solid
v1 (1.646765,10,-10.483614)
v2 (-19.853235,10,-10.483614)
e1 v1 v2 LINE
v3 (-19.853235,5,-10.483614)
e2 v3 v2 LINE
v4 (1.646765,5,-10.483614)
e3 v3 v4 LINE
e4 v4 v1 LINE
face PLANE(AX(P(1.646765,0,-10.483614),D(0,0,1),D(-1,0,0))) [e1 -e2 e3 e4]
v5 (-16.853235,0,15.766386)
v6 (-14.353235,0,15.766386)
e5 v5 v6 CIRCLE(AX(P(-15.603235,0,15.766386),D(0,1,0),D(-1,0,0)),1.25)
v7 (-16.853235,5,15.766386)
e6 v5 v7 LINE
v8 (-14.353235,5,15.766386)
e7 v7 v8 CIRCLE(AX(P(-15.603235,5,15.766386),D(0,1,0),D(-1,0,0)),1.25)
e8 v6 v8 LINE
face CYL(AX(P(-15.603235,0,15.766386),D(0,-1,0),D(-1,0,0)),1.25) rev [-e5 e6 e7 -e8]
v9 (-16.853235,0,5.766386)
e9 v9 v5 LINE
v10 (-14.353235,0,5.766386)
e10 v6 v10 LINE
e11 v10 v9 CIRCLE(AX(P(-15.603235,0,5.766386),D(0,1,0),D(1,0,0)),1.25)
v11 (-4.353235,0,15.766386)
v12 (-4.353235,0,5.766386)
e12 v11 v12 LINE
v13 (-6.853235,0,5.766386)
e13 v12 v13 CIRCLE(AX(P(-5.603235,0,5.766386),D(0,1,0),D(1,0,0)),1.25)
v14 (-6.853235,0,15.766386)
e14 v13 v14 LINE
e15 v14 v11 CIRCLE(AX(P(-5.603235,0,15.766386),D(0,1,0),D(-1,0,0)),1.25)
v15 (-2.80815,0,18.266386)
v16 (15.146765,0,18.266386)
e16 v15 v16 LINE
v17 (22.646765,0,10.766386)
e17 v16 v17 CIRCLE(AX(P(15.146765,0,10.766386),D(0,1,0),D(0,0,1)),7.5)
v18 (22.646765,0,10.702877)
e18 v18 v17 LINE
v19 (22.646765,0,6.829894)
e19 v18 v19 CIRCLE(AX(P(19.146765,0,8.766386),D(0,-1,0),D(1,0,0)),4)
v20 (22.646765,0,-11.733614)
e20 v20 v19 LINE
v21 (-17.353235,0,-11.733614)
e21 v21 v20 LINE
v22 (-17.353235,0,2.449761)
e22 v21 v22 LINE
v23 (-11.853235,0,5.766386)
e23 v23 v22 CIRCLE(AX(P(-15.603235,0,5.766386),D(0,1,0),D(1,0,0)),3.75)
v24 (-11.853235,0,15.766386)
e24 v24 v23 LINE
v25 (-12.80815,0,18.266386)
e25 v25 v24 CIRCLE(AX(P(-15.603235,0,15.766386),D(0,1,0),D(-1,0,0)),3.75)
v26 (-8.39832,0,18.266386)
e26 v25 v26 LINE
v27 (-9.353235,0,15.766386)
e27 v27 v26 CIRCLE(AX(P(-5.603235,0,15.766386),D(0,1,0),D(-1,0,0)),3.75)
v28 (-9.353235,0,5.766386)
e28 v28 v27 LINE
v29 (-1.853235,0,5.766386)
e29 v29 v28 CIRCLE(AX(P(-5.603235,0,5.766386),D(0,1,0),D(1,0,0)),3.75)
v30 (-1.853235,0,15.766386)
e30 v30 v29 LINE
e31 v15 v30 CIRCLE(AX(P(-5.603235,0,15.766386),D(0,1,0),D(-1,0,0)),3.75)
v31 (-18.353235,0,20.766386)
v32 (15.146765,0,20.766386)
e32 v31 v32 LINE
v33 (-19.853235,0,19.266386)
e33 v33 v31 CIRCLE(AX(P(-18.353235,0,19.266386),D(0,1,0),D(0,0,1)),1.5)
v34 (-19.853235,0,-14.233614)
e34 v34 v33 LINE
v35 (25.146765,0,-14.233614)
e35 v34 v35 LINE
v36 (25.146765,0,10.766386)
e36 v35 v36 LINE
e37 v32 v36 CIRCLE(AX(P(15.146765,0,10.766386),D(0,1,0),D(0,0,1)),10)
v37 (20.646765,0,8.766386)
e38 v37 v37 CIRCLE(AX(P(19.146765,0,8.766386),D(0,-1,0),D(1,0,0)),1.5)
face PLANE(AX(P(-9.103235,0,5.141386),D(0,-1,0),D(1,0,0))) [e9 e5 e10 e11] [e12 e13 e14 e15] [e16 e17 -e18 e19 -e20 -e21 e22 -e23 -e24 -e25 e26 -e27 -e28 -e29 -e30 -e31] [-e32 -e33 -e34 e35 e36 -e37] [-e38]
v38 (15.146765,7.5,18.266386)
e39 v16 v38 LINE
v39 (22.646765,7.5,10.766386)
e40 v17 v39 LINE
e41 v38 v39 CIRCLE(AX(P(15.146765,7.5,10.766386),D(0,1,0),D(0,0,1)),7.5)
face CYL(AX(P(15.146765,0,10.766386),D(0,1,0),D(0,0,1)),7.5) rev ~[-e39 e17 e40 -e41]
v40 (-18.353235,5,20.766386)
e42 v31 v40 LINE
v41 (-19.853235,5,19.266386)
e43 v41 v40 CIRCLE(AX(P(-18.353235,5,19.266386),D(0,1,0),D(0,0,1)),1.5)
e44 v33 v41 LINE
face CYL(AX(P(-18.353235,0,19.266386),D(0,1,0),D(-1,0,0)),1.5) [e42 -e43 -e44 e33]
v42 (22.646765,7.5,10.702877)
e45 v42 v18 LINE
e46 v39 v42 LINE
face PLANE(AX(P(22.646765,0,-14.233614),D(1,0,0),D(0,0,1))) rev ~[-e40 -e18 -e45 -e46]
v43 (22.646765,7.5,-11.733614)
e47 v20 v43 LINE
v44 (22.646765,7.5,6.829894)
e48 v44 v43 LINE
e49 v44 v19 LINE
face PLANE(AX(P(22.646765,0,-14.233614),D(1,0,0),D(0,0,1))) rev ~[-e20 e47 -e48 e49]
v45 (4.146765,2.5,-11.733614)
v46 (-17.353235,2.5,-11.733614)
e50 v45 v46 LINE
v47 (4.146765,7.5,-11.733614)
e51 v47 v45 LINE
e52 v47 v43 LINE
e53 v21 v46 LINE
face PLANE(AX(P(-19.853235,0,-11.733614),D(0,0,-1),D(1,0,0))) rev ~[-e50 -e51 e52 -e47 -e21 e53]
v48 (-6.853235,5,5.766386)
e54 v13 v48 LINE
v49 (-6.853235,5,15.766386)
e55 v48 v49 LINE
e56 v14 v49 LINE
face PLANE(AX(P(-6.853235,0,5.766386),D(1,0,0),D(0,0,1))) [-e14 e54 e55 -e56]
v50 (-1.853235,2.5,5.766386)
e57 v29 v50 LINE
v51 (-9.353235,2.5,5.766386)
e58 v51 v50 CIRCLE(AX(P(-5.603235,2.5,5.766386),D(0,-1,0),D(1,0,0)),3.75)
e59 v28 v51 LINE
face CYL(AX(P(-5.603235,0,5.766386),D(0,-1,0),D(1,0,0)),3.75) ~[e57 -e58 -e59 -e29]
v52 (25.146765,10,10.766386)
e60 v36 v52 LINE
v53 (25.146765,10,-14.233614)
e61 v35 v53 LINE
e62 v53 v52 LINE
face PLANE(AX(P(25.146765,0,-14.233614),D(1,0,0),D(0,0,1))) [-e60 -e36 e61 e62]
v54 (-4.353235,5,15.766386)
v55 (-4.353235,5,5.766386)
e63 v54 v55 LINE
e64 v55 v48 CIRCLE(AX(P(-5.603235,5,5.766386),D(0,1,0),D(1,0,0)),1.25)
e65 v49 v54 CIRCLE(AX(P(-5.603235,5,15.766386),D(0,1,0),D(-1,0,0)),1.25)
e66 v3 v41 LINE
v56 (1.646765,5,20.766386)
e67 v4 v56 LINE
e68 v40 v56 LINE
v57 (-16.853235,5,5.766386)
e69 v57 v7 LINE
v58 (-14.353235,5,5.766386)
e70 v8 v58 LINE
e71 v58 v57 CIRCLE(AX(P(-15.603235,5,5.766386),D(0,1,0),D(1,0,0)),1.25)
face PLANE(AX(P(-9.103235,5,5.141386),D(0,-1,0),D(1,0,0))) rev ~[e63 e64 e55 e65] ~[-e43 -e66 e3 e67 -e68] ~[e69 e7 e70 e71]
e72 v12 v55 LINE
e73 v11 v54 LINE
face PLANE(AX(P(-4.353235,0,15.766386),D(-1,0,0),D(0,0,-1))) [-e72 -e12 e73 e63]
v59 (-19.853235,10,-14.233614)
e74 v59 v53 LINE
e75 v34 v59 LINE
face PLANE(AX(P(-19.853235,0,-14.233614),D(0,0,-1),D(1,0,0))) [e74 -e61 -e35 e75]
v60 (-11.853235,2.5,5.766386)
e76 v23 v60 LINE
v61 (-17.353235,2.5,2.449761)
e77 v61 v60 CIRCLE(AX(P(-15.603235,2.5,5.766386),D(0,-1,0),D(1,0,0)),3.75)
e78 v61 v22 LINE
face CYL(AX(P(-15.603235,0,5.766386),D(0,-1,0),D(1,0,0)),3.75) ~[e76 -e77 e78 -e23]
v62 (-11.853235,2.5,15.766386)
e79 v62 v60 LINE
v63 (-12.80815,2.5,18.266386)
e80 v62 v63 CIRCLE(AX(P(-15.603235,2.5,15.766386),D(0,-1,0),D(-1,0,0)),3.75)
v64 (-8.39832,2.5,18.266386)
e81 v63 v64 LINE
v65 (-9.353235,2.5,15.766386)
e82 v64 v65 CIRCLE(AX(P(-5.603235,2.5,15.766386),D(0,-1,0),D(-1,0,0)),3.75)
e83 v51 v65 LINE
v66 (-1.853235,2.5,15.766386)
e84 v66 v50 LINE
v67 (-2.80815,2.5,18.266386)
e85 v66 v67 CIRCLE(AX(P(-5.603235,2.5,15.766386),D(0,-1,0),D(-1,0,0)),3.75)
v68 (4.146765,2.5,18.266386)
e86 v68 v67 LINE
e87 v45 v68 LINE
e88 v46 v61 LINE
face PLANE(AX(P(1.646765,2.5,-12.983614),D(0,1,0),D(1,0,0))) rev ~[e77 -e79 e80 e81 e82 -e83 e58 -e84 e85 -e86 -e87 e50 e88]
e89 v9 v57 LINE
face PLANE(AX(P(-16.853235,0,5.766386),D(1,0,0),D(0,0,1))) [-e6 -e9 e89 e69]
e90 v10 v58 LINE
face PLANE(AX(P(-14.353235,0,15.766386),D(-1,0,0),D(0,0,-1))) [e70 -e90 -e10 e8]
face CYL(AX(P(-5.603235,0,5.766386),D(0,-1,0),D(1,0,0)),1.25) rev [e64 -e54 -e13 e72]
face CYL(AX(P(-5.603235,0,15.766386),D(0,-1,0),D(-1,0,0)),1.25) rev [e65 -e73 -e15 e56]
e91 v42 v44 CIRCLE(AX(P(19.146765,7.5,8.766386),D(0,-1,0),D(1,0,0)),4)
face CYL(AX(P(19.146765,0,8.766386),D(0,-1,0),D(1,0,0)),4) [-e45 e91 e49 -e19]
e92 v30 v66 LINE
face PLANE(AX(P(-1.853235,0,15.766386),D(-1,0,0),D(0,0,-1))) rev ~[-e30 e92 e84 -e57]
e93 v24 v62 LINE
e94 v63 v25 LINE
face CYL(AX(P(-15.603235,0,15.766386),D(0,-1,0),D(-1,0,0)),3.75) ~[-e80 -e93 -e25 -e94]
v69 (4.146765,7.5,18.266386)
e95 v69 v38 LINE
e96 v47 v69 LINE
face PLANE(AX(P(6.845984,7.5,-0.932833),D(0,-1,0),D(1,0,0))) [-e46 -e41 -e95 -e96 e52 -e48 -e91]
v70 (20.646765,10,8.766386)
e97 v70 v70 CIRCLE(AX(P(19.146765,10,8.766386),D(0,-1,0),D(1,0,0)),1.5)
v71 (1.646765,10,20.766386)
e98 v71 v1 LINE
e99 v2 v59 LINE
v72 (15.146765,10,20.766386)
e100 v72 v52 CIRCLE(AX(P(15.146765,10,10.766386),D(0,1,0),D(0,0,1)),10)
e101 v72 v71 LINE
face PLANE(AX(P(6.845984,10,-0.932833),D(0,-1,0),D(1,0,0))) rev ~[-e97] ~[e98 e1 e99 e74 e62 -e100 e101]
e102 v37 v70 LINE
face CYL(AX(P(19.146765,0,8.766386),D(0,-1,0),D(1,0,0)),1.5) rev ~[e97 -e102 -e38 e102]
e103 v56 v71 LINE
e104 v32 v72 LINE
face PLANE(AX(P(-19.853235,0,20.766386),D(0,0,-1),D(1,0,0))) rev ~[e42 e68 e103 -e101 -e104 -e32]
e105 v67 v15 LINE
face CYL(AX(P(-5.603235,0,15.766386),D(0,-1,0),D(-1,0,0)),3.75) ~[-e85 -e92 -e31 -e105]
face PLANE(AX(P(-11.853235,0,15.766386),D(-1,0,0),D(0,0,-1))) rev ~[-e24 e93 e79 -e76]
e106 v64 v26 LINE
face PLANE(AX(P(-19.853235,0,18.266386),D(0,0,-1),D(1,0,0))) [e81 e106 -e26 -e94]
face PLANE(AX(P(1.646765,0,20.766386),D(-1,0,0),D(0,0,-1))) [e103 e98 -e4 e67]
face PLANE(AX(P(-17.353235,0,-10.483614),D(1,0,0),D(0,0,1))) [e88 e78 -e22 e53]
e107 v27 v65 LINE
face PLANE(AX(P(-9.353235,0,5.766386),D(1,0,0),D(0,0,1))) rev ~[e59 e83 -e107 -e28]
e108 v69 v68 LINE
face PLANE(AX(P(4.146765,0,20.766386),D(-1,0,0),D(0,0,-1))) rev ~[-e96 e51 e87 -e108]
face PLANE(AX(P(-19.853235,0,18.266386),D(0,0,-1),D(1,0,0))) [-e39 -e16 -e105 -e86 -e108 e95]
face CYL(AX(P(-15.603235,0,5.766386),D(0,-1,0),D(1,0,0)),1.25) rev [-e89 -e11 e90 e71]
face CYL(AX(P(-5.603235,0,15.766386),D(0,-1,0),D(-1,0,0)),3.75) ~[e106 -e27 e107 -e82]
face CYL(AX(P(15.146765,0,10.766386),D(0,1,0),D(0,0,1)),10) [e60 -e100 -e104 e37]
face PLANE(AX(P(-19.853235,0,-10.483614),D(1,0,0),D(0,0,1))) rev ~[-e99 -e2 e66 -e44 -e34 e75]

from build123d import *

# Parameters (mm, degrees)
F0_R        = 1.5
F1_DEPTH    = 10
F2_R        = 10
F0_W        = 21.5
F0_H        = 31.25
F3_DEPTH    = 5
F4_T        = 2.5
F4_T3_DEPTH = 26.5
F4_T5_DEPTH = 10
F4_T7_DEPTH = 36.25
F5_R        = 1.5


# Not quite as in the source:
# - a shell that OpenCascade refuses in one call is made with other operations: the cavity is built on its own and cut out


with BuildPart() as f1:
    # F0 (on Front) → F1 (new body)
    with BuildSketch(Plane.XZ):
        Polygon((25.1467653117, 20.7663856067), (1.6467653117, 20.7663856067), (1.6467653117, -10.4836143933), (-19.8532346883, -10.4836143933), (-19.8532346883, -14.2336143933), (25.1467653117, -14.2336143933), align=None)
        with Locations((19.1467653117, 8.7663856067)):
            Circle(F0_R, mode=Mode.SUBTRACT)
    extrude(amount=-F1_DEPTH)

    # F2
    f2_edges = [f1.edges().sort_by_distance(p)[0] for p in [
        (25.146765, 5, 20.766386),
    ]]
    fillet(f2_edges, radius=F2_R)

    # F0 (on Front) → F3 (join)
    with BuildSketch(Plane.XZ):
        with Locations((-9.1032346883, 5.1413856067)):
            Rectangle(F0_W, F0_H)
        with BuildLine():
            ThreePointArc((-16.8532346883, 15.7663856067), (-15.6032346883, 17.0163856067), (-14.3532346883, 15.7663856067))
            Line((-14.3532346883, 15.7663856067), (-14.3532346883, 5.7663856067))
            ThreePointArc((-14.3532346883, 5.7663856067), (-15.6032346883, 4.5163856067), (-16.8532346883, 5.7663856067))
            Line((-16.8532346883, 5.7663856067), (-16.8532346883, 15.7663856067))
        make_face(mode=Mode.SUBTRACT)
        with BuildLine():
            ThreePointArc((-6.8532346883, 15.7663856067), (-5.6032346883, 17.0163856067), (-4.3532346883, 15.7663856067))
            Line((-4.3532346883, 15.7663856067), (-4.3532346883, 5.7663856067))
            ThreePointArc((-4.3532346883, 5.7663856067), (-5.6032346883, 4.5163856067), (-6.8532346883, 5.7663856067))
            Line((-6.8532346883, 5.7663856067), (-6.8532346883, 15.7663856067))
        make_face(mode=Mode.SUBTRACT)
    extrude(amount=-F3_DEPTH)

    # F4: shell of thickness 2.5, made by hand


with BuildPart() as f4_core1:
    # F4_t2: copy of F1
    add(f1.part)

    # the walls: a layer under each face that stays
    f4_faces = [f4_core1.faces().sort_by_distance(p)[0] for p in [
        (25.1467653117, 5, -1.7336143933),
        (2.6467653117, 10, 3.2663856067),
        (17.6467653117, 5, 8.7663856067),
        (-9.1032346883, 7.5, -10.4836143933),
        (-9.1032346883, 5, 5.1413856067),
        (-5.6032346883, 2.5, 4.5163856067),
        (-4.3532346883, 2.5, 10.7663856067),
        (-5.6032346883, 2.5, 17.0163856067),
        (-6.8532346883, 2.5, 10.7663856067),
        (-15.6032346883, 2.5, 4.5163856067),
        (-14.3532346883, 2.5, 10.7663856067),
        (-15.6032346883, 2.5, 17.0163856067),
        (-16.8532346883, 2.5, 10.7663856067),
        (1.6467653117, 7.5, 5.1413856067),
        (-19.8532346883, 1.6666666667, 14.9330522734),
        (9.3134319783, 8.3333333333, 20.7663856067),
        (2.6467653117, 5, -14.2336143933),
        (22.2178331235, 5, 17.8374534186),
    ]]
    thicken(f4_faces, amount=-F4_T, mode=Mode.SUBTRACT)

    # F4_s4 → F4_t3 (cut)
    with BuildSketch(Plane.YZ.offset(-22.3532346883)):
        Polygon((5.025, -10.4586143933), (5, -12.9836143933), (2.5, -12.9836143933), (2.5, -10.4836143933), align=None)
    extrude(amount=F4_T3_DEPTH, mode=Mode.SUBTRACT)

    # F4_s6 → F4_t5 (cut)
    with BuildSketch(Plane.XZ.offset(-12.5)):
        Polygon((1.6217653117, -10.4586143933), (1.6467653117, -12.9836143933), (4.1467653117, -12.9836143933), (4.1467653117, -10.4836143933), align=None)
    extrude(amount=F4_T5_DEPTH, mode=Mode.SUBTRACT)

    # F4_s8 → F4_t7 (cut)
    with BuildSketch(Plane.XY.offset(-12.9836143933)):
        Polygon((1.6217653117, 5.025), (1.6467653117, 2.5), (4.1467653117, 2.5), (4.1467653117, 5), align=None)
    extrude(amount=F4_T7_DEPTH, mode=Mode.SUBTRACT)


with BuildPart() as f1_1:
    add(f1.part)

    # what is left inside the walls is the cavity
    f4_cavity = [f4_core1.part.solids().sort_by_distance(p)[0] for p in [
        (2.646765, 0.025, -1.733614),
    ]]
    add(f4_cavity, mode=Mode.SUBTRACT)

    # F5
    f5_edges = [f1_1.edges().sort_by_distance(p)[0] for p in [
        (-19.853235, 2.5, 20.766386),
    ]]
    fillet(f5_edges, radius=F5_R)


solid = f1_1.part
